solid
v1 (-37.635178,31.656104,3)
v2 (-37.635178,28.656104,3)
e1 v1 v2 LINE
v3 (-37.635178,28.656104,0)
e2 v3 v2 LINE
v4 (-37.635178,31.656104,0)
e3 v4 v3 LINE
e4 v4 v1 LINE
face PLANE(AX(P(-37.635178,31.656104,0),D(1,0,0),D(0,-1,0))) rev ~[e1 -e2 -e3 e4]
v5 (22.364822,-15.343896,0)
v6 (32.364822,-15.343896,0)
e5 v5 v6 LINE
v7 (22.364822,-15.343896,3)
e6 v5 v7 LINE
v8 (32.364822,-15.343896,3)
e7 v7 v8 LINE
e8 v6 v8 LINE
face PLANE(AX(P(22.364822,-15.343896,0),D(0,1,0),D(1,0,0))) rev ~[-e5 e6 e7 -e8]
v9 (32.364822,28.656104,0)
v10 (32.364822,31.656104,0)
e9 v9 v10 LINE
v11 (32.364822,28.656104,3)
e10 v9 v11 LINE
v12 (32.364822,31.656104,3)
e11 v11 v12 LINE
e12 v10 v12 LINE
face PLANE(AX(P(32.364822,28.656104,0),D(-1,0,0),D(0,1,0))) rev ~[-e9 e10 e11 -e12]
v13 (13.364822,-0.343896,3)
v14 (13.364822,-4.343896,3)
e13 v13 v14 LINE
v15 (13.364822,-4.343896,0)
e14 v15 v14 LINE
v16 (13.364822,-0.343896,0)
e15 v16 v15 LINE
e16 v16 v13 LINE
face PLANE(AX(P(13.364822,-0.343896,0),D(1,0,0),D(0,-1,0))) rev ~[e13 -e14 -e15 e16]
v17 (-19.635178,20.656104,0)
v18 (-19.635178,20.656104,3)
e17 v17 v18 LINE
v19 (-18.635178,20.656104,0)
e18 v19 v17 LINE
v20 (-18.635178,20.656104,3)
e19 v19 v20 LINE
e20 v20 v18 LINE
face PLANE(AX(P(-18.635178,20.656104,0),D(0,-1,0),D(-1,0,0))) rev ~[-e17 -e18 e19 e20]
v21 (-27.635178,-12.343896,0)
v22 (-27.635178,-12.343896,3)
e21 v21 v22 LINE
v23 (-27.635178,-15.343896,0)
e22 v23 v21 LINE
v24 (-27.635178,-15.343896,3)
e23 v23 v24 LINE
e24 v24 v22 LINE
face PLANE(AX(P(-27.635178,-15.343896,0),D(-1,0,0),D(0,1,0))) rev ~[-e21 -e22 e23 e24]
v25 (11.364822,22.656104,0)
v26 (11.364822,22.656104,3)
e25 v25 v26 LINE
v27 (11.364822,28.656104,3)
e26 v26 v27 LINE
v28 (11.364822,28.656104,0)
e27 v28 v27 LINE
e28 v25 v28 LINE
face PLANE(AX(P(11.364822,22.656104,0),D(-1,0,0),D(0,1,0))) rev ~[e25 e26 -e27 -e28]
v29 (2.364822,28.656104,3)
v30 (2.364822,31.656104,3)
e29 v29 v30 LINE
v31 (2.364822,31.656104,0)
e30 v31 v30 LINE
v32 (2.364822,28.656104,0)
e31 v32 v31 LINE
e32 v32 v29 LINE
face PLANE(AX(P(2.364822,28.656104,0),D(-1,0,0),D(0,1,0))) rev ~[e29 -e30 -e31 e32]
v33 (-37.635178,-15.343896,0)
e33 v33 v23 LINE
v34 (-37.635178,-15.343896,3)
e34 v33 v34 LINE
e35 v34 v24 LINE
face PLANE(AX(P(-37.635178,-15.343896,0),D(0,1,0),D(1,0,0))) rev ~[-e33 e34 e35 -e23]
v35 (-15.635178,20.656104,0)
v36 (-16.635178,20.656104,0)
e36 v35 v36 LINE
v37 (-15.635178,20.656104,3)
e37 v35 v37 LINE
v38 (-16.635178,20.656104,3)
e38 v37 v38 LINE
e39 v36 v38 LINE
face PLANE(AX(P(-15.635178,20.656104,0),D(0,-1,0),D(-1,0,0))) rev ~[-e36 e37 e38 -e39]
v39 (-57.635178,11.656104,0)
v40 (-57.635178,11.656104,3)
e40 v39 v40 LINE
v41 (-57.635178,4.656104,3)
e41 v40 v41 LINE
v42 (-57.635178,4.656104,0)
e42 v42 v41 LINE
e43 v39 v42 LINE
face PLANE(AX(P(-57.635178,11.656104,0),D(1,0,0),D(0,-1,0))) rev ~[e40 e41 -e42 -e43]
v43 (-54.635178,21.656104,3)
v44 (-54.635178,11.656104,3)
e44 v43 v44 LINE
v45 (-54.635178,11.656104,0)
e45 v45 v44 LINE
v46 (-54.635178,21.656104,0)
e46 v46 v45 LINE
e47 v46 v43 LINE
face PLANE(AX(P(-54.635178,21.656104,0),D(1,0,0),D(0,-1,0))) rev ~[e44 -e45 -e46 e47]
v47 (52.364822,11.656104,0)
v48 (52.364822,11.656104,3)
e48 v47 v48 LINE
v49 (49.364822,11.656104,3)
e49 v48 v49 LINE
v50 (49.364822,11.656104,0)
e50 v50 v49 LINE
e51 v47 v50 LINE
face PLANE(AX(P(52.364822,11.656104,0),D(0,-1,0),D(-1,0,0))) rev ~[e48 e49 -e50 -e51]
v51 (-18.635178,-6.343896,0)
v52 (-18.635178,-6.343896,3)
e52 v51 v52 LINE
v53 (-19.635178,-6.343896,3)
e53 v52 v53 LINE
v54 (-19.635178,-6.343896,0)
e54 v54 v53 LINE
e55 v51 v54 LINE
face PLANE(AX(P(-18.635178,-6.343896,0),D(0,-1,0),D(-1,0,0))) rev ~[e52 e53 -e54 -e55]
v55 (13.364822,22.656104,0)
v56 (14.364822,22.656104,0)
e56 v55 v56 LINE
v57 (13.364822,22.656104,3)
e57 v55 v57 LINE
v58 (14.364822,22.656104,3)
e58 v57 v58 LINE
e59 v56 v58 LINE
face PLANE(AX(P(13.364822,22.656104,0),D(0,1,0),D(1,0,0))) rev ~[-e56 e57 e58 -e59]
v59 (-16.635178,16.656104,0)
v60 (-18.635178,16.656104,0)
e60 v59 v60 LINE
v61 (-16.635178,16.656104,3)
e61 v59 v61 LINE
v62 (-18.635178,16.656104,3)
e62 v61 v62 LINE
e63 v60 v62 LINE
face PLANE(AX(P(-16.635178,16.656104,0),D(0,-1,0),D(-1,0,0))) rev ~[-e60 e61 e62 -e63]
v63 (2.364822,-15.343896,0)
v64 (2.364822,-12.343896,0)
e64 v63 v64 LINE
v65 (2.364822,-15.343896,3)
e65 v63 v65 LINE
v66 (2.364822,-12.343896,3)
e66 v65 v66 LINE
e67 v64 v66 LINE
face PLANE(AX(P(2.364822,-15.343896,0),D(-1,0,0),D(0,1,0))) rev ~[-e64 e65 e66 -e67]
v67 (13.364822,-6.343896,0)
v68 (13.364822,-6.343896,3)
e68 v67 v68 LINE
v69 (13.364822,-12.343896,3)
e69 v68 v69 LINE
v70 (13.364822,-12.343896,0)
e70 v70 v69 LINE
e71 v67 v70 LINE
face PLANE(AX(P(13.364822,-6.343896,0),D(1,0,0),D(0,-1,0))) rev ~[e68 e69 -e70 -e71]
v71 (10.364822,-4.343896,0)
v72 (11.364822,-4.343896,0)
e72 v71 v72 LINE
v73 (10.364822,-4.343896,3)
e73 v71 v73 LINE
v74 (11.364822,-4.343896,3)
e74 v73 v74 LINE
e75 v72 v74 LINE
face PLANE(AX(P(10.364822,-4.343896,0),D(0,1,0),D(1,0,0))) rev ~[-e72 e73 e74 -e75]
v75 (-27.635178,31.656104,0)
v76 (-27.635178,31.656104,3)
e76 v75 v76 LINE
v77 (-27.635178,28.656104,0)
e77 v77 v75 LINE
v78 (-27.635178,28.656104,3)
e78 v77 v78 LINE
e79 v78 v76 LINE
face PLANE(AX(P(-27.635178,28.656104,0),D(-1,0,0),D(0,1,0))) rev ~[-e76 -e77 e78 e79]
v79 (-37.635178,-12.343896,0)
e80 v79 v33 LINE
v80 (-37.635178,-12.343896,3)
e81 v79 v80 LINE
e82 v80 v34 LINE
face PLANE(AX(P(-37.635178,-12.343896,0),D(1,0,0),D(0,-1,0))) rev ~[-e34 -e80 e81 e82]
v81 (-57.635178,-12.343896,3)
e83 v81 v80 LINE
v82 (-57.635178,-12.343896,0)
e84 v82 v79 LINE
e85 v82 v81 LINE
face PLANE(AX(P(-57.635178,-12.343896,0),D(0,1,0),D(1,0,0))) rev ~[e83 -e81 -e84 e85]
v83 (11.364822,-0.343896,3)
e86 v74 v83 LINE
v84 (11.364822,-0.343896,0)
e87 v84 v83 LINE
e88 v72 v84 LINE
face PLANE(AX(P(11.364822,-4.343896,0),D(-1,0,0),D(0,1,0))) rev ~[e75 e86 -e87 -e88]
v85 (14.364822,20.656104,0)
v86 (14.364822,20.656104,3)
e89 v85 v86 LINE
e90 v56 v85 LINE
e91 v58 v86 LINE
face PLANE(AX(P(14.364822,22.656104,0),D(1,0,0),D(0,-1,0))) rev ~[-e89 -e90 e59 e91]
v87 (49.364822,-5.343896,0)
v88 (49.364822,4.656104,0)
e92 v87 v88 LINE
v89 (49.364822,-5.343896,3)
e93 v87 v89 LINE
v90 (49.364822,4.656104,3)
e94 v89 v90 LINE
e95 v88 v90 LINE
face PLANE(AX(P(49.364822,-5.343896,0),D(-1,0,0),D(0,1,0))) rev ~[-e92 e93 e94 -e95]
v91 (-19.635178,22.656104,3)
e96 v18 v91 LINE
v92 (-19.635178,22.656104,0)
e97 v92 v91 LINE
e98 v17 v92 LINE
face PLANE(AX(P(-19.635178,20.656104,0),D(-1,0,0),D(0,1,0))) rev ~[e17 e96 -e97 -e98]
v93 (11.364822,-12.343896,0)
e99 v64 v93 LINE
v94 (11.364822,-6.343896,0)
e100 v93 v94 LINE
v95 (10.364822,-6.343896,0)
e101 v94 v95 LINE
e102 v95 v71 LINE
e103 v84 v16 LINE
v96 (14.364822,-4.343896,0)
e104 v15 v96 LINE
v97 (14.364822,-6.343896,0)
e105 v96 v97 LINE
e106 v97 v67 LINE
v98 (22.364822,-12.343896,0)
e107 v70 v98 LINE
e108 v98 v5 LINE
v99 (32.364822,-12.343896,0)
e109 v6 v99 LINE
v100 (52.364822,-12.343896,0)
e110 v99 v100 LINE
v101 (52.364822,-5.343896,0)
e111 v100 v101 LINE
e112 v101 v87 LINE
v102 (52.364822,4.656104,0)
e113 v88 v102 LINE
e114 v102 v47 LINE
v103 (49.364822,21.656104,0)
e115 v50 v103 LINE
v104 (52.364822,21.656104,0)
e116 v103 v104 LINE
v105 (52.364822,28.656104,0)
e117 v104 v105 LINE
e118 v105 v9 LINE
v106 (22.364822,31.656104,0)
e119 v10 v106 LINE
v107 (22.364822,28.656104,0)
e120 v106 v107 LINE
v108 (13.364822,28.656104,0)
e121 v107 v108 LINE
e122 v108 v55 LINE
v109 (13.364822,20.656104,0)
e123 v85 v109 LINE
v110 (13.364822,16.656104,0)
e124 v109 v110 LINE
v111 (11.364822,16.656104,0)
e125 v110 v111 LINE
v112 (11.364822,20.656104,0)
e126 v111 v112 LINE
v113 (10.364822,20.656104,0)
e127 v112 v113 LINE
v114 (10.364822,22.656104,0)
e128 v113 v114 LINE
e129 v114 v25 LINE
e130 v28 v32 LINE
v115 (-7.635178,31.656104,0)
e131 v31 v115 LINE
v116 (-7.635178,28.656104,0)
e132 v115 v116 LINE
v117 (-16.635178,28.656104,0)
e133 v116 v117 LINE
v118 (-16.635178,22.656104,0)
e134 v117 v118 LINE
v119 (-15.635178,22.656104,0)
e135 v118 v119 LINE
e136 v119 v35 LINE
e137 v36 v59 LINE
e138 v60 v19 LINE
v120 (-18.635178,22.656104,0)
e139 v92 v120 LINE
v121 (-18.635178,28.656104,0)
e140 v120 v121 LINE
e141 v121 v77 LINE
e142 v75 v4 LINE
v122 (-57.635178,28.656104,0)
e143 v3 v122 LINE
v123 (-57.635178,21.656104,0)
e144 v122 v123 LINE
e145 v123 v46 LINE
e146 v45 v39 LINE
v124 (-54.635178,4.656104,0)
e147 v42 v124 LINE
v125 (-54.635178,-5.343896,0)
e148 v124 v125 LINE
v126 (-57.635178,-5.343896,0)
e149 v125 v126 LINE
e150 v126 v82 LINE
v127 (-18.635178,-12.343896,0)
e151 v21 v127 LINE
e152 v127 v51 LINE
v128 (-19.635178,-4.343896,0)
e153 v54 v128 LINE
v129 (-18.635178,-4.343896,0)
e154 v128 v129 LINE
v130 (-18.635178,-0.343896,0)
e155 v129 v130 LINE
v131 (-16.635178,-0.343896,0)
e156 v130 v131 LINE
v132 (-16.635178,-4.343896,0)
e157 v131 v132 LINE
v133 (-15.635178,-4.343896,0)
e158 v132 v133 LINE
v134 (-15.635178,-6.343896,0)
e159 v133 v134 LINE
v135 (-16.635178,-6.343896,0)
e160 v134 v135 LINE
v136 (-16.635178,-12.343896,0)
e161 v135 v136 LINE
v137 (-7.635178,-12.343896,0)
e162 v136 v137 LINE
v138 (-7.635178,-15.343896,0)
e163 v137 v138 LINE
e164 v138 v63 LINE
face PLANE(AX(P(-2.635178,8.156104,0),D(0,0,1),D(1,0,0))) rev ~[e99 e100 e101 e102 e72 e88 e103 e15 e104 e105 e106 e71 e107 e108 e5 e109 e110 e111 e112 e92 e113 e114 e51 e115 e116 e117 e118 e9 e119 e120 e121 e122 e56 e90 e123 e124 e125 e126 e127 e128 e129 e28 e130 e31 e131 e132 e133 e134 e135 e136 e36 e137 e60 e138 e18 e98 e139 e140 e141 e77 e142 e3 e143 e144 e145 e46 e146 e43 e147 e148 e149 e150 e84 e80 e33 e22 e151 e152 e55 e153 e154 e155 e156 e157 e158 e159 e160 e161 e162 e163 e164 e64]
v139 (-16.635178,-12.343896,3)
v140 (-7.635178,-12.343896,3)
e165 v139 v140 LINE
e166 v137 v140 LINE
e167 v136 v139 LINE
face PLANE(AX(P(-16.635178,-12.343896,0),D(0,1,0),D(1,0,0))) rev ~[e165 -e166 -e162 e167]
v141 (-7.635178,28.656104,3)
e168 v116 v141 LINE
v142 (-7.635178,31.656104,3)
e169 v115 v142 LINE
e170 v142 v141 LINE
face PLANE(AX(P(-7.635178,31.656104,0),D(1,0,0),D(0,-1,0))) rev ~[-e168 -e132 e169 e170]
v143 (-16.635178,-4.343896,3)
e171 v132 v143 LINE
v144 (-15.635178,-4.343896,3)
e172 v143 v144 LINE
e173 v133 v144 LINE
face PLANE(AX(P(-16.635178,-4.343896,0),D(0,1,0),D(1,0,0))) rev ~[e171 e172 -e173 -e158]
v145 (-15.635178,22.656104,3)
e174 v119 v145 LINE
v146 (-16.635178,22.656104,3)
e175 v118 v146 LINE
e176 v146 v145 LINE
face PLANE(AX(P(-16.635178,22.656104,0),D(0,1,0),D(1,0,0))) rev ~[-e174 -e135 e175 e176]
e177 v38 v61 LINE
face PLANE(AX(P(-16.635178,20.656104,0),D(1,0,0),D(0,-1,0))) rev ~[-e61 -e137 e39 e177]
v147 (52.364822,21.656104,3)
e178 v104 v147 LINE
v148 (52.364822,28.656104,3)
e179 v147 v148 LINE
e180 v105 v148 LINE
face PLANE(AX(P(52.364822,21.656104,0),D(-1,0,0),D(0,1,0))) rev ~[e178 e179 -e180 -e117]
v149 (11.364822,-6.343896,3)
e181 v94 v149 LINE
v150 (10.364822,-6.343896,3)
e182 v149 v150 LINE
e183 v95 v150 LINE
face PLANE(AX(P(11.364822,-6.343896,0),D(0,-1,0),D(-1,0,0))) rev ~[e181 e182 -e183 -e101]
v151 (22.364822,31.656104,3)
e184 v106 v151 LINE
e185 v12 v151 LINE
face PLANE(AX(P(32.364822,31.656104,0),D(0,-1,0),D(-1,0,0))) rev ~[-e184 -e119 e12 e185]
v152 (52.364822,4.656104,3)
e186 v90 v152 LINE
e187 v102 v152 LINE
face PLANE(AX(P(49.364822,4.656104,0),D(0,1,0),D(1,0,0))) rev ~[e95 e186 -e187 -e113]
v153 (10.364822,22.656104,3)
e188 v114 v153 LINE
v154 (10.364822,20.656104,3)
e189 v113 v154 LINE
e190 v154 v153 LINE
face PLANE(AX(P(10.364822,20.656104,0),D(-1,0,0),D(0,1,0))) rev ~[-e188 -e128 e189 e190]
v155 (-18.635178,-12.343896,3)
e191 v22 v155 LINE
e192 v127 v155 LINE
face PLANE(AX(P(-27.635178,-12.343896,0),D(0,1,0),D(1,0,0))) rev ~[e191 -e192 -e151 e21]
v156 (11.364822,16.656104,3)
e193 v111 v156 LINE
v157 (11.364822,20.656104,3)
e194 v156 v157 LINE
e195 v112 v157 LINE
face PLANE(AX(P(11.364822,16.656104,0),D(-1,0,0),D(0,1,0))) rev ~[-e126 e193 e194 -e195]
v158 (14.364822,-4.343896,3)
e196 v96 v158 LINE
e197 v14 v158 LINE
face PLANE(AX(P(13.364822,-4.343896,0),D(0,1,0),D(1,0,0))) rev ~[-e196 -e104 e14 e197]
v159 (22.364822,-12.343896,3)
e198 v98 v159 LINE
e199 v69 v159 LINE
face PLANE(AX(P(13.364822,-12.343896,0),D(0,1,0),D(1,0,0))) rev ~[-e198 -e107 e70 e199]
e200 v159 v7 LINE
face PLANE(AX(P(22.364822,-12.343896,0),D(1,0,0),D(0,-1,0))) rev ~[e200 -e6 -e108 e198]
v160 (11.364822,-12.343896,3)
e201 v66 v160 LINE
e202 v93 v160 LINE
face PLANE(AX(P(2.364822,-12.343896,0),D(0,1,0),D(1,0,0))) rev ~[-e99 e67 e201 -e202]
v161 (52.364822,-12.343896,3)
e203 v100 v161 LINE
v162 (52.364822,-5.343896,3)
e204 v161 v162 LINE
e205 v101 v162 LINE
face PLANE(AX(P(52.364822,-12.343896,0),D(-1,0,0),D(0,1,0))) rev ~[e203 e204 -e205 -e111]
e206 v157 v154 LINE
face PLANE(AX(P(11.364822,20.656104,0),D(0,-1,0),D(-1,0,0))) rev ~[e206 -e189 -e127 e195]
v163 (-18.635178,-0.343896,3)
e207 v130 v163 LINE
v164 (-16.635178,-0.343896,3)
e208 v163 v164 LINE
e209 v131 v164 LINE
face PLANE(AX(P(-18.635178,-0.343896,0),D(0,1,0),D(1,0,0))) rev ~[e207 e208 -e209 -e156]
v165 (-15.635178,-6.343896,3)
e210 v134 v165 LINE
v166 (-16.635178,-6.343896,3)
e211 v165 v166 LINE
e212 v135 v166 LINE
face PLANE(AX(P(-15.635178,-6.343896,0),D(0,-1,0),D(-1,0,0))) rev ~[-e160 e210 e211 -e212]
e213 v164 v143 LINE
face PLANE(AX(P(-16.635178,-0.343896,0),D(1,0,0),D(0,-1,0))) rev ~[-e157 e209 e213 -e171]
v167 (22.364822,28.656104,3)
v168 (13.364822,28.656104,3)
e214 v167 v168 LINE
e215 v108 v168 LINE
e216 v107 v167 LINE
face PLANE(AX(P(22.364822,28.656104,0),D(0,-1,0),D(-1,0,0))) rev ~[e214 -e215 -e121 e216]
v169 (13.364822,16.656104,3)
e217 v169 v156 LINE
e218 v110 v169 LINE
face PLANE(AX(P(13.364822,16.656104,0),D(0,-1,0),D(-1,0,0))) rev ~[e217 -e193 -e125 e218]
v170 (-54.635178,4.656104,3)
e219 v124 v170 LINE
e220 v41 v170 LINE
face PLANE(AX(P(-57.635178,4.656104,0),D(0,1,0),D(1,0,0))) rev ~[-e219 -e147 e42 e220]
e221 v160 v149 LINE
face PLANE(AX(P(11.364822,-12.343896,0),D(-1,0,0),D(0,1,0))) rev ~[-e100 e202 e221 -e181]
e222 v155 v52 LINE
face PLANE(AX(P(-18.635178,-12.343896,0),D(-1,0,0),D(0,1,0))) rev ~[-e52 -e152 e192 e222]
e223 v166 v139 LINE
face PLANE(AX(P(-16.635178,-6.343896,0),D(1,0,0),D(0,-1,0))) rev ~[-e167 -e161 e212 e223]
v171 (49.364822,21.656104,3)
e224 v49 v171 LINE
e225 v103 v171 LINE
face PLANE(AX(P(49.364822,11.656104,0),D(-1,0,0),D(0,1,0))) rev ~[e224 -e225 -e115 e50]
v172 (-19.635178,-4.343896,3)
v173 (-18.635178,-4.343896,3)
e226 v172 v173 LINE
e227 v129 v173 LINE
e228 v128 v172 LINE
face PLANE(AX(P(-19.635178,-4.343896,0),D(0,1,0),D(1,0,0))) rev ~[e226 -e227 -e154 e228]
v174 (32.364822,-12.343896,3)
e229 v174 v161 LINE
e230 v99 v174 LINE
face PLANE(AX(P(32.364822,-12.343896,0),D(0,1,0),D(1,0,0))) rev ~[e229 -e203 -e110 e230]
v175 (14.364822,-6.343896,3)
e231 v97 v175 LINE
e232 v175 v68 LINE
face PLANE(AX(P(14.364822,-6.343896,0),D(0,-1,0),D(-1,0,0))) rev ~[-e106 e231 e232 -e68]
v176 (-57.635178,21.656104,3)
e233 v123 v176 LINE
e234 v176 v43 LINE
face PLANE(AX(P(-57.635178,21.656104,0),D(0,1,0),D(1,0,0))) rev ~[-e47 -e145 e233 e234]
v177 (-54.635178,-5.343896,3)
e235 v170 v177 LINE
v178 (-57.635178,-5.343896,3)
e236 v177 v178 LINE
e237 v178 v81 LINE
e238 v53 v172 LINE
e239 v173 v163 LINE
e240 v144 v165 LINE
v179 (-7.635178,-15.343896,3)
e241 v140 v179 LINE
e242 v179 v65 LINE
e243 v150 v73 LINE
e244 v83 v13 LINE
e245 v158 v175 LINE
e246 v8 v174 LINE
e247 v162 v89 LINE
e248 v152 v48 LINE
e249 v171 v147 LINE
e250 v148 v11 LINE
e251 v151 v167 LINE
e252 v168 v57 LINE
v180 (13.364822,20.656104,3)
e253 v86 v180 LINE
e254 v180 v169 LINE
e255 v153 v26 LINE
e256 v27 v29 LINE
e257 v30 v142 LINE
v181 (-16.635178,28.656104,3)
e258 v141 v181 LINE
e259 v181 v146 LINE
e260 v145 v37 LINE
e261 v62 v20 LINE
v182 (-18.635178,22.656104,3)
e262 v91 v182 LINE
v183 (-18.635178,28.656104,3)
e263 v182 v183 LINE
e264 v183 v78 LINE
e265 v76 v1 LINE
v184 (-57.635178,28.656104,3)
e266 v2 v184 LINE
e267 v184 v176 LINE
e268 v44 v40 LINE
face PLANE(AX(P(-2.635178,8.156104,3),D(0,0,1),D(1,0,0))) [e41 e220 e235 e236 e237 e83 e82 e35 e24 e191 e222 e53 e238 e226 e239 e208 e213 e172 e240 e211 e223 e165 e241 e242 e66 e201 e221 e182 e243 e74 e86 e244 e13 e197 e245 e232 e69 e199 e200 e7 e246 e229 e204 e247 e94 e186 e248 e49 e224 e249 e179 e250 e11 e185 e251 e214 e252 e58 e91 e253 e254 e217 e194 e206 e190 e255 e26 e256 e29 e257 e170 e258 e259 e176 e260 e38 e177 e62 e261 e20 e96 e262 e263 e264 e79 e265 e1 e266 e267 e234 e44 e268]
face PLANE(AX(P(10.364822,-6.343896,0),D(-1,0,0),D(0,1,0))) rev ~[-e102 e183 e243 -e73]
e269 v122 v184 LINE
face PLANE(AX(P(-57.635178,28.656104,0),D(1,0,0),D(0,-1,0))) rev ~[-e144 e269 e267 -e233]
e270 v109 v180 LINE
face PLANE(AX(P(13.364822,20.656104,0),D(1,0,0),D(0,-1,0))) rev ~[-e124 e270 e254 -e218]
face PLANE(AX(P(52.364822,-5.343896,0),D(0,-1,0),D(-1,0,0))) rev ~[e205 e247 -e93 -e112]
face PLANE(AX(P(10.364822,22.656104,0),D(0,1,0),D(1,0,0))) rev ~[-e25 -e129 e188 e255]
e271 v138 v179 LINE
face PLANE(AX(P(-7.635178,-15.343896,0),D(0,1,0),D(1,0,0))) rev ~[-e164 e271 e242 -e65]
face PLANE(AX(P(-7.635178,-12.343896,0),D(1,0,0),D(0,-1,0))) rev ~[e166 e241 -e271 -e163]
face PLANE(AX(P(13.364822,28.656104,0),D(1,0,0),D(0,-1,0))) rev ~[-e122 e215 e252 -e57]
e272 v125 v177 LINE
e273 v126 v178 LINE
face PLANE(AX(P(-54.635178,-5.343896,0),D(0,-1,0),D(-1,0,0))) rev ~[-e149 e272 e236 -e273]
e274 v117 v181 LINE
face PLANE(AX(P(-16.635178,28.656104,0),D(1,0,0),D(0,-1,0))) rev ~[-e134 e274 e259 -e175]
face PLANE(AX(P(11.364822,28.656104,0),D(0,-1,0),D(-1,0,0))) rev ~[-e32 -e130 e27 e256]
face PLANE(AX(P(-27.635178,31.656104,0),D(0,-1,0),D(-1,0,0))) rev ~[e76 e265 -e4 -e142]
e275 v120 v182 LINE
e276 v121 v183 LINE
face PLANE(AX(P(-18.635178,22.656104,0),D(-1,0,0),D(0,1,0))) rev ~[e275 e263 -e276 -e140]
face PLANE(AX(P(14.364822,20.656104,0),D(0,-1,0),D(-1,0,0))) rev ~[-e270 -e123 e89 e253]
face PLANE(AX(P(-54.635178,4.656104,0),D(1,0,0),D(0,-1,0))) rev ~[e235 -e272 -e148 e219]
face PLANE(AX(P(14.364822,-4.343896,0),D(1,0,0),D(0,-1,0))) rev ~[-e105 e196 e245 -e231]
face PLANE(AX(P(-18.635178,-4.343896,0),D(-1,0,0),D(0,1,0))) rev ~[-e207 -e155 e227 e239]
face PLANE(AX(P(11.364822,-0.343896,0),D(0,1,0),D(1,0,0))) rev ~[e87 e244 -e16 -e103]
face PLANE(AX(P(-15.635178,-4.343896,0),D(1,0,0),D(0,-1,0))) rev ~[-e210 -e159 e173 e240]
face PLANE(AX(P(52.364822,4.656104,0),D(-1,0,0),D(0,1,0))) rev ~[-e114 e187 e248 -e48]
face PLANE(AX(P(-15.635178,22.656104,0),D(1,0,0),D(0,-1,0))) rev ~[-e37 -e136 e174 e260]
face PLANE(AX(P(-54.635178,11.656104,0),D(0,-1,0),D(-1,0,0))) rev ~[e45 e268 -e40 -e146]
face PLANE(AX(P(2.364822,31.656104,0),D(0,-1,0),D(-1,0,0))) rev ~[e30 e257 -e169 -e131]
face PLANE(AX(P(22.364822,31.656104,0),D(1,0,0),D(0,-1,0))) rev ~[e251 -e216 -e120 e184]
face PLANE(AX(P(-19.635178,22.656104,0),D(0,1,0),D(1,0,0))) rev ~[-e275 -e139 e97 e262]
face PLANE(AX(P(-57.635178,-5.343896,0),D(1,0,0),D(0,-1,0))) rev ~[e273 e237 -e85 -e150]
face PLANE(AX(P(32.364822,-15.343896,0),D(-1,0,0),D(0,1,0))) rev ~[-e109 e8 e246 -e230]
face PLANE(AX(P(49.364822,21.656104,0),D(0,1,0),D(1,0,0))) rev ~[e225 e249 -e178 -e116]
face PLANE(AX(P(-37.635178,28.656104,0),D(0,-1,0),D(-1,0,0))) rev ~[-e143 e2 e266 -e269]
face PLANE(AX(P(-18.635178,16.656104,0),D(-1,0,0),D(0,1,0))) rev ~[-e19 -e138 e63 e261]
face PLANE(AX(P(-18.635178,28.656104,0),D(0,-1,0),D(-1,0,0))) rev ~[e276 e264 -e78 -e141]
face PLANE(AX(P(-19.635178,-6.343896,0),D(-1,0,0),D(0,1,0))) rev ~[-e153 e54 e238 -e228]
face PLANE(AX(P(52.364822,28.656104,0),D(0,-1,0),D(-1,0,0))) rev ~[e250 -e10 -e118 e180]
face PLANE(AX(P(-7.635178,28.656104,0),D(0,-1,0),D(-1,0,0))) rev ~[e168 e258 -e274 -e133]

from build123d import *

# Parameters (mm, degrees)
F1_DEPTH = 3


# Not quite as in the source:
# - a feature names something its author has since deleted; it is built from what else it names


with BuildPart() as f1:
    # F0 (on Top) → F1 (new body)
    with BuildSketch(Plane.XY):
        Polygon((-7.6351782978, -15.3438961133), (2.3648217022, -15.3438961133), (2.3648217022, -12.3438961133), (11.3648217022, -12.3438961133), (11.3648217022, -6.3438961133), (10.3648217022, -6.3438961133), (10.3648217022, -4.3438961133), (11.3648217022, -4.3438961133), (11.3648217022, -0.3438961133), (13.3648217022, -0.3438961133), (13.3648217022, -4.3438961133), (14.3648217022, -4.3438961133), (14.3648217022, -6.3438961133), (13.3648217022, -6.3438961133), (13.3648217022, -12.3438961133), (22.3648217022, -12.3438961133), (22.3648217022, -15.3438961133), (32.3648217022, -15.3438961133), (32.3648217022, -12.3438961133), (52.3648217022, -12.3438961133), (52.3648217022, -5.3438961133), (49.3648217022, -5.3438961133), (49.3648217022, 4.6561038867), (52.3648217022, 4.6561038867), (52.3648217022, 11.6561038867), (49.3648217022, 11.6561038867), (49.3648217022, 21.6561038867), (52.3648217022, 21.6561038867), (52.3648217022, 28.6561038867), (32.3648217022, 28.6561038867), (32.3648217022, 31.6561038867), (22.3648217022, 31.6561038867), (22.3648217022, 28.6561038867), (13.3648217022, 28.6561038867), (13.3648217022, 22.6561038867), (14.3648217022, 22.6561038867), (14.3648217022, 20.6561038867), (13.3648217022, 20.6561038867), (13.3648217022, 16.6561038867), (11.3648217022, 16.6561038867), (11.3648217022, 20.6561038867), (10.3648217022, 20.6561038867), (10.3648217022, 22.6561038867), (11.3648217022, 22.6561038867), (11.3648217022, 28.6561038867), (2.3648217022, 28.6561038867), (2.3648217022, 31.6561038867), (-7.6351782978, 31.6561038867), (-7.6351782978, 28.6561038867), (-16.6351782978, 28.6561038867), (-16.6351782978, 22.6561038867), (-15.6351782978, 22.6561038867), (-15.6351782978, 20.6561038867), (-16.6351782978, 20.6561038867), (-16.6351782978, 16.6561038867), (-18.6351782978, 16.6561038867), (-18.6351782978, 20.6561038867), (-19.6351782978, 20.6561038867), (-19.6351782978, 22.6561038867), (-18.6351782978, 22.6561038867), (-18.6351782978, 28.6561038867), (-27.6351782978, 28.6561038867), (-27.6351782978, 31.6561038867), (-37.6351782978, 31.6561038867), (-37.6351782978, 28.6561038867), (-57.6351782978, 28.6561038867), (-57.6351782978, 21.6561038867), (-54.6351782978, 21.6561038867), (-54.6351782978, 11.6561038867), (-57.6351782978, 11.6561038867), (-57.6351782978, 4.6561038867), (-54.6351782978, 4.6561038867), (-54.6351782978, -5.3438961133), (-57.6351782978, -5.3438961133), (-57.6351782978, -12.3438961133), (-37.6351782978, -12.3438961133), (-37.6351782978, -15.3438961133), (-27.6351782978, -15.3438961133), (-27.6351782978, -12.3438961133), (-18.6351782978, -12.3438961133), (-18.6351782978, -6.3438961133), (-19.6351782978, -6.3438961133), (-19.6351782978, -4.3438961133), (-18.6351782978, -4.3438961133), (-18.6351782978, -0.3438961133), (-16.6351782978, -0.3438961133), (-16.6351782978, -4.3438961133), (-15.6351782978, -4.3438961133), (-15.6351782978, -6.3438961133), (-16.6351782978, -6.3438961133), (-16.6351782978, -12.3438961133), (-7.6351782978, -12.3438961133), align=None)
    extrude(amount=F1_DEPTH)


solid = f1.part
